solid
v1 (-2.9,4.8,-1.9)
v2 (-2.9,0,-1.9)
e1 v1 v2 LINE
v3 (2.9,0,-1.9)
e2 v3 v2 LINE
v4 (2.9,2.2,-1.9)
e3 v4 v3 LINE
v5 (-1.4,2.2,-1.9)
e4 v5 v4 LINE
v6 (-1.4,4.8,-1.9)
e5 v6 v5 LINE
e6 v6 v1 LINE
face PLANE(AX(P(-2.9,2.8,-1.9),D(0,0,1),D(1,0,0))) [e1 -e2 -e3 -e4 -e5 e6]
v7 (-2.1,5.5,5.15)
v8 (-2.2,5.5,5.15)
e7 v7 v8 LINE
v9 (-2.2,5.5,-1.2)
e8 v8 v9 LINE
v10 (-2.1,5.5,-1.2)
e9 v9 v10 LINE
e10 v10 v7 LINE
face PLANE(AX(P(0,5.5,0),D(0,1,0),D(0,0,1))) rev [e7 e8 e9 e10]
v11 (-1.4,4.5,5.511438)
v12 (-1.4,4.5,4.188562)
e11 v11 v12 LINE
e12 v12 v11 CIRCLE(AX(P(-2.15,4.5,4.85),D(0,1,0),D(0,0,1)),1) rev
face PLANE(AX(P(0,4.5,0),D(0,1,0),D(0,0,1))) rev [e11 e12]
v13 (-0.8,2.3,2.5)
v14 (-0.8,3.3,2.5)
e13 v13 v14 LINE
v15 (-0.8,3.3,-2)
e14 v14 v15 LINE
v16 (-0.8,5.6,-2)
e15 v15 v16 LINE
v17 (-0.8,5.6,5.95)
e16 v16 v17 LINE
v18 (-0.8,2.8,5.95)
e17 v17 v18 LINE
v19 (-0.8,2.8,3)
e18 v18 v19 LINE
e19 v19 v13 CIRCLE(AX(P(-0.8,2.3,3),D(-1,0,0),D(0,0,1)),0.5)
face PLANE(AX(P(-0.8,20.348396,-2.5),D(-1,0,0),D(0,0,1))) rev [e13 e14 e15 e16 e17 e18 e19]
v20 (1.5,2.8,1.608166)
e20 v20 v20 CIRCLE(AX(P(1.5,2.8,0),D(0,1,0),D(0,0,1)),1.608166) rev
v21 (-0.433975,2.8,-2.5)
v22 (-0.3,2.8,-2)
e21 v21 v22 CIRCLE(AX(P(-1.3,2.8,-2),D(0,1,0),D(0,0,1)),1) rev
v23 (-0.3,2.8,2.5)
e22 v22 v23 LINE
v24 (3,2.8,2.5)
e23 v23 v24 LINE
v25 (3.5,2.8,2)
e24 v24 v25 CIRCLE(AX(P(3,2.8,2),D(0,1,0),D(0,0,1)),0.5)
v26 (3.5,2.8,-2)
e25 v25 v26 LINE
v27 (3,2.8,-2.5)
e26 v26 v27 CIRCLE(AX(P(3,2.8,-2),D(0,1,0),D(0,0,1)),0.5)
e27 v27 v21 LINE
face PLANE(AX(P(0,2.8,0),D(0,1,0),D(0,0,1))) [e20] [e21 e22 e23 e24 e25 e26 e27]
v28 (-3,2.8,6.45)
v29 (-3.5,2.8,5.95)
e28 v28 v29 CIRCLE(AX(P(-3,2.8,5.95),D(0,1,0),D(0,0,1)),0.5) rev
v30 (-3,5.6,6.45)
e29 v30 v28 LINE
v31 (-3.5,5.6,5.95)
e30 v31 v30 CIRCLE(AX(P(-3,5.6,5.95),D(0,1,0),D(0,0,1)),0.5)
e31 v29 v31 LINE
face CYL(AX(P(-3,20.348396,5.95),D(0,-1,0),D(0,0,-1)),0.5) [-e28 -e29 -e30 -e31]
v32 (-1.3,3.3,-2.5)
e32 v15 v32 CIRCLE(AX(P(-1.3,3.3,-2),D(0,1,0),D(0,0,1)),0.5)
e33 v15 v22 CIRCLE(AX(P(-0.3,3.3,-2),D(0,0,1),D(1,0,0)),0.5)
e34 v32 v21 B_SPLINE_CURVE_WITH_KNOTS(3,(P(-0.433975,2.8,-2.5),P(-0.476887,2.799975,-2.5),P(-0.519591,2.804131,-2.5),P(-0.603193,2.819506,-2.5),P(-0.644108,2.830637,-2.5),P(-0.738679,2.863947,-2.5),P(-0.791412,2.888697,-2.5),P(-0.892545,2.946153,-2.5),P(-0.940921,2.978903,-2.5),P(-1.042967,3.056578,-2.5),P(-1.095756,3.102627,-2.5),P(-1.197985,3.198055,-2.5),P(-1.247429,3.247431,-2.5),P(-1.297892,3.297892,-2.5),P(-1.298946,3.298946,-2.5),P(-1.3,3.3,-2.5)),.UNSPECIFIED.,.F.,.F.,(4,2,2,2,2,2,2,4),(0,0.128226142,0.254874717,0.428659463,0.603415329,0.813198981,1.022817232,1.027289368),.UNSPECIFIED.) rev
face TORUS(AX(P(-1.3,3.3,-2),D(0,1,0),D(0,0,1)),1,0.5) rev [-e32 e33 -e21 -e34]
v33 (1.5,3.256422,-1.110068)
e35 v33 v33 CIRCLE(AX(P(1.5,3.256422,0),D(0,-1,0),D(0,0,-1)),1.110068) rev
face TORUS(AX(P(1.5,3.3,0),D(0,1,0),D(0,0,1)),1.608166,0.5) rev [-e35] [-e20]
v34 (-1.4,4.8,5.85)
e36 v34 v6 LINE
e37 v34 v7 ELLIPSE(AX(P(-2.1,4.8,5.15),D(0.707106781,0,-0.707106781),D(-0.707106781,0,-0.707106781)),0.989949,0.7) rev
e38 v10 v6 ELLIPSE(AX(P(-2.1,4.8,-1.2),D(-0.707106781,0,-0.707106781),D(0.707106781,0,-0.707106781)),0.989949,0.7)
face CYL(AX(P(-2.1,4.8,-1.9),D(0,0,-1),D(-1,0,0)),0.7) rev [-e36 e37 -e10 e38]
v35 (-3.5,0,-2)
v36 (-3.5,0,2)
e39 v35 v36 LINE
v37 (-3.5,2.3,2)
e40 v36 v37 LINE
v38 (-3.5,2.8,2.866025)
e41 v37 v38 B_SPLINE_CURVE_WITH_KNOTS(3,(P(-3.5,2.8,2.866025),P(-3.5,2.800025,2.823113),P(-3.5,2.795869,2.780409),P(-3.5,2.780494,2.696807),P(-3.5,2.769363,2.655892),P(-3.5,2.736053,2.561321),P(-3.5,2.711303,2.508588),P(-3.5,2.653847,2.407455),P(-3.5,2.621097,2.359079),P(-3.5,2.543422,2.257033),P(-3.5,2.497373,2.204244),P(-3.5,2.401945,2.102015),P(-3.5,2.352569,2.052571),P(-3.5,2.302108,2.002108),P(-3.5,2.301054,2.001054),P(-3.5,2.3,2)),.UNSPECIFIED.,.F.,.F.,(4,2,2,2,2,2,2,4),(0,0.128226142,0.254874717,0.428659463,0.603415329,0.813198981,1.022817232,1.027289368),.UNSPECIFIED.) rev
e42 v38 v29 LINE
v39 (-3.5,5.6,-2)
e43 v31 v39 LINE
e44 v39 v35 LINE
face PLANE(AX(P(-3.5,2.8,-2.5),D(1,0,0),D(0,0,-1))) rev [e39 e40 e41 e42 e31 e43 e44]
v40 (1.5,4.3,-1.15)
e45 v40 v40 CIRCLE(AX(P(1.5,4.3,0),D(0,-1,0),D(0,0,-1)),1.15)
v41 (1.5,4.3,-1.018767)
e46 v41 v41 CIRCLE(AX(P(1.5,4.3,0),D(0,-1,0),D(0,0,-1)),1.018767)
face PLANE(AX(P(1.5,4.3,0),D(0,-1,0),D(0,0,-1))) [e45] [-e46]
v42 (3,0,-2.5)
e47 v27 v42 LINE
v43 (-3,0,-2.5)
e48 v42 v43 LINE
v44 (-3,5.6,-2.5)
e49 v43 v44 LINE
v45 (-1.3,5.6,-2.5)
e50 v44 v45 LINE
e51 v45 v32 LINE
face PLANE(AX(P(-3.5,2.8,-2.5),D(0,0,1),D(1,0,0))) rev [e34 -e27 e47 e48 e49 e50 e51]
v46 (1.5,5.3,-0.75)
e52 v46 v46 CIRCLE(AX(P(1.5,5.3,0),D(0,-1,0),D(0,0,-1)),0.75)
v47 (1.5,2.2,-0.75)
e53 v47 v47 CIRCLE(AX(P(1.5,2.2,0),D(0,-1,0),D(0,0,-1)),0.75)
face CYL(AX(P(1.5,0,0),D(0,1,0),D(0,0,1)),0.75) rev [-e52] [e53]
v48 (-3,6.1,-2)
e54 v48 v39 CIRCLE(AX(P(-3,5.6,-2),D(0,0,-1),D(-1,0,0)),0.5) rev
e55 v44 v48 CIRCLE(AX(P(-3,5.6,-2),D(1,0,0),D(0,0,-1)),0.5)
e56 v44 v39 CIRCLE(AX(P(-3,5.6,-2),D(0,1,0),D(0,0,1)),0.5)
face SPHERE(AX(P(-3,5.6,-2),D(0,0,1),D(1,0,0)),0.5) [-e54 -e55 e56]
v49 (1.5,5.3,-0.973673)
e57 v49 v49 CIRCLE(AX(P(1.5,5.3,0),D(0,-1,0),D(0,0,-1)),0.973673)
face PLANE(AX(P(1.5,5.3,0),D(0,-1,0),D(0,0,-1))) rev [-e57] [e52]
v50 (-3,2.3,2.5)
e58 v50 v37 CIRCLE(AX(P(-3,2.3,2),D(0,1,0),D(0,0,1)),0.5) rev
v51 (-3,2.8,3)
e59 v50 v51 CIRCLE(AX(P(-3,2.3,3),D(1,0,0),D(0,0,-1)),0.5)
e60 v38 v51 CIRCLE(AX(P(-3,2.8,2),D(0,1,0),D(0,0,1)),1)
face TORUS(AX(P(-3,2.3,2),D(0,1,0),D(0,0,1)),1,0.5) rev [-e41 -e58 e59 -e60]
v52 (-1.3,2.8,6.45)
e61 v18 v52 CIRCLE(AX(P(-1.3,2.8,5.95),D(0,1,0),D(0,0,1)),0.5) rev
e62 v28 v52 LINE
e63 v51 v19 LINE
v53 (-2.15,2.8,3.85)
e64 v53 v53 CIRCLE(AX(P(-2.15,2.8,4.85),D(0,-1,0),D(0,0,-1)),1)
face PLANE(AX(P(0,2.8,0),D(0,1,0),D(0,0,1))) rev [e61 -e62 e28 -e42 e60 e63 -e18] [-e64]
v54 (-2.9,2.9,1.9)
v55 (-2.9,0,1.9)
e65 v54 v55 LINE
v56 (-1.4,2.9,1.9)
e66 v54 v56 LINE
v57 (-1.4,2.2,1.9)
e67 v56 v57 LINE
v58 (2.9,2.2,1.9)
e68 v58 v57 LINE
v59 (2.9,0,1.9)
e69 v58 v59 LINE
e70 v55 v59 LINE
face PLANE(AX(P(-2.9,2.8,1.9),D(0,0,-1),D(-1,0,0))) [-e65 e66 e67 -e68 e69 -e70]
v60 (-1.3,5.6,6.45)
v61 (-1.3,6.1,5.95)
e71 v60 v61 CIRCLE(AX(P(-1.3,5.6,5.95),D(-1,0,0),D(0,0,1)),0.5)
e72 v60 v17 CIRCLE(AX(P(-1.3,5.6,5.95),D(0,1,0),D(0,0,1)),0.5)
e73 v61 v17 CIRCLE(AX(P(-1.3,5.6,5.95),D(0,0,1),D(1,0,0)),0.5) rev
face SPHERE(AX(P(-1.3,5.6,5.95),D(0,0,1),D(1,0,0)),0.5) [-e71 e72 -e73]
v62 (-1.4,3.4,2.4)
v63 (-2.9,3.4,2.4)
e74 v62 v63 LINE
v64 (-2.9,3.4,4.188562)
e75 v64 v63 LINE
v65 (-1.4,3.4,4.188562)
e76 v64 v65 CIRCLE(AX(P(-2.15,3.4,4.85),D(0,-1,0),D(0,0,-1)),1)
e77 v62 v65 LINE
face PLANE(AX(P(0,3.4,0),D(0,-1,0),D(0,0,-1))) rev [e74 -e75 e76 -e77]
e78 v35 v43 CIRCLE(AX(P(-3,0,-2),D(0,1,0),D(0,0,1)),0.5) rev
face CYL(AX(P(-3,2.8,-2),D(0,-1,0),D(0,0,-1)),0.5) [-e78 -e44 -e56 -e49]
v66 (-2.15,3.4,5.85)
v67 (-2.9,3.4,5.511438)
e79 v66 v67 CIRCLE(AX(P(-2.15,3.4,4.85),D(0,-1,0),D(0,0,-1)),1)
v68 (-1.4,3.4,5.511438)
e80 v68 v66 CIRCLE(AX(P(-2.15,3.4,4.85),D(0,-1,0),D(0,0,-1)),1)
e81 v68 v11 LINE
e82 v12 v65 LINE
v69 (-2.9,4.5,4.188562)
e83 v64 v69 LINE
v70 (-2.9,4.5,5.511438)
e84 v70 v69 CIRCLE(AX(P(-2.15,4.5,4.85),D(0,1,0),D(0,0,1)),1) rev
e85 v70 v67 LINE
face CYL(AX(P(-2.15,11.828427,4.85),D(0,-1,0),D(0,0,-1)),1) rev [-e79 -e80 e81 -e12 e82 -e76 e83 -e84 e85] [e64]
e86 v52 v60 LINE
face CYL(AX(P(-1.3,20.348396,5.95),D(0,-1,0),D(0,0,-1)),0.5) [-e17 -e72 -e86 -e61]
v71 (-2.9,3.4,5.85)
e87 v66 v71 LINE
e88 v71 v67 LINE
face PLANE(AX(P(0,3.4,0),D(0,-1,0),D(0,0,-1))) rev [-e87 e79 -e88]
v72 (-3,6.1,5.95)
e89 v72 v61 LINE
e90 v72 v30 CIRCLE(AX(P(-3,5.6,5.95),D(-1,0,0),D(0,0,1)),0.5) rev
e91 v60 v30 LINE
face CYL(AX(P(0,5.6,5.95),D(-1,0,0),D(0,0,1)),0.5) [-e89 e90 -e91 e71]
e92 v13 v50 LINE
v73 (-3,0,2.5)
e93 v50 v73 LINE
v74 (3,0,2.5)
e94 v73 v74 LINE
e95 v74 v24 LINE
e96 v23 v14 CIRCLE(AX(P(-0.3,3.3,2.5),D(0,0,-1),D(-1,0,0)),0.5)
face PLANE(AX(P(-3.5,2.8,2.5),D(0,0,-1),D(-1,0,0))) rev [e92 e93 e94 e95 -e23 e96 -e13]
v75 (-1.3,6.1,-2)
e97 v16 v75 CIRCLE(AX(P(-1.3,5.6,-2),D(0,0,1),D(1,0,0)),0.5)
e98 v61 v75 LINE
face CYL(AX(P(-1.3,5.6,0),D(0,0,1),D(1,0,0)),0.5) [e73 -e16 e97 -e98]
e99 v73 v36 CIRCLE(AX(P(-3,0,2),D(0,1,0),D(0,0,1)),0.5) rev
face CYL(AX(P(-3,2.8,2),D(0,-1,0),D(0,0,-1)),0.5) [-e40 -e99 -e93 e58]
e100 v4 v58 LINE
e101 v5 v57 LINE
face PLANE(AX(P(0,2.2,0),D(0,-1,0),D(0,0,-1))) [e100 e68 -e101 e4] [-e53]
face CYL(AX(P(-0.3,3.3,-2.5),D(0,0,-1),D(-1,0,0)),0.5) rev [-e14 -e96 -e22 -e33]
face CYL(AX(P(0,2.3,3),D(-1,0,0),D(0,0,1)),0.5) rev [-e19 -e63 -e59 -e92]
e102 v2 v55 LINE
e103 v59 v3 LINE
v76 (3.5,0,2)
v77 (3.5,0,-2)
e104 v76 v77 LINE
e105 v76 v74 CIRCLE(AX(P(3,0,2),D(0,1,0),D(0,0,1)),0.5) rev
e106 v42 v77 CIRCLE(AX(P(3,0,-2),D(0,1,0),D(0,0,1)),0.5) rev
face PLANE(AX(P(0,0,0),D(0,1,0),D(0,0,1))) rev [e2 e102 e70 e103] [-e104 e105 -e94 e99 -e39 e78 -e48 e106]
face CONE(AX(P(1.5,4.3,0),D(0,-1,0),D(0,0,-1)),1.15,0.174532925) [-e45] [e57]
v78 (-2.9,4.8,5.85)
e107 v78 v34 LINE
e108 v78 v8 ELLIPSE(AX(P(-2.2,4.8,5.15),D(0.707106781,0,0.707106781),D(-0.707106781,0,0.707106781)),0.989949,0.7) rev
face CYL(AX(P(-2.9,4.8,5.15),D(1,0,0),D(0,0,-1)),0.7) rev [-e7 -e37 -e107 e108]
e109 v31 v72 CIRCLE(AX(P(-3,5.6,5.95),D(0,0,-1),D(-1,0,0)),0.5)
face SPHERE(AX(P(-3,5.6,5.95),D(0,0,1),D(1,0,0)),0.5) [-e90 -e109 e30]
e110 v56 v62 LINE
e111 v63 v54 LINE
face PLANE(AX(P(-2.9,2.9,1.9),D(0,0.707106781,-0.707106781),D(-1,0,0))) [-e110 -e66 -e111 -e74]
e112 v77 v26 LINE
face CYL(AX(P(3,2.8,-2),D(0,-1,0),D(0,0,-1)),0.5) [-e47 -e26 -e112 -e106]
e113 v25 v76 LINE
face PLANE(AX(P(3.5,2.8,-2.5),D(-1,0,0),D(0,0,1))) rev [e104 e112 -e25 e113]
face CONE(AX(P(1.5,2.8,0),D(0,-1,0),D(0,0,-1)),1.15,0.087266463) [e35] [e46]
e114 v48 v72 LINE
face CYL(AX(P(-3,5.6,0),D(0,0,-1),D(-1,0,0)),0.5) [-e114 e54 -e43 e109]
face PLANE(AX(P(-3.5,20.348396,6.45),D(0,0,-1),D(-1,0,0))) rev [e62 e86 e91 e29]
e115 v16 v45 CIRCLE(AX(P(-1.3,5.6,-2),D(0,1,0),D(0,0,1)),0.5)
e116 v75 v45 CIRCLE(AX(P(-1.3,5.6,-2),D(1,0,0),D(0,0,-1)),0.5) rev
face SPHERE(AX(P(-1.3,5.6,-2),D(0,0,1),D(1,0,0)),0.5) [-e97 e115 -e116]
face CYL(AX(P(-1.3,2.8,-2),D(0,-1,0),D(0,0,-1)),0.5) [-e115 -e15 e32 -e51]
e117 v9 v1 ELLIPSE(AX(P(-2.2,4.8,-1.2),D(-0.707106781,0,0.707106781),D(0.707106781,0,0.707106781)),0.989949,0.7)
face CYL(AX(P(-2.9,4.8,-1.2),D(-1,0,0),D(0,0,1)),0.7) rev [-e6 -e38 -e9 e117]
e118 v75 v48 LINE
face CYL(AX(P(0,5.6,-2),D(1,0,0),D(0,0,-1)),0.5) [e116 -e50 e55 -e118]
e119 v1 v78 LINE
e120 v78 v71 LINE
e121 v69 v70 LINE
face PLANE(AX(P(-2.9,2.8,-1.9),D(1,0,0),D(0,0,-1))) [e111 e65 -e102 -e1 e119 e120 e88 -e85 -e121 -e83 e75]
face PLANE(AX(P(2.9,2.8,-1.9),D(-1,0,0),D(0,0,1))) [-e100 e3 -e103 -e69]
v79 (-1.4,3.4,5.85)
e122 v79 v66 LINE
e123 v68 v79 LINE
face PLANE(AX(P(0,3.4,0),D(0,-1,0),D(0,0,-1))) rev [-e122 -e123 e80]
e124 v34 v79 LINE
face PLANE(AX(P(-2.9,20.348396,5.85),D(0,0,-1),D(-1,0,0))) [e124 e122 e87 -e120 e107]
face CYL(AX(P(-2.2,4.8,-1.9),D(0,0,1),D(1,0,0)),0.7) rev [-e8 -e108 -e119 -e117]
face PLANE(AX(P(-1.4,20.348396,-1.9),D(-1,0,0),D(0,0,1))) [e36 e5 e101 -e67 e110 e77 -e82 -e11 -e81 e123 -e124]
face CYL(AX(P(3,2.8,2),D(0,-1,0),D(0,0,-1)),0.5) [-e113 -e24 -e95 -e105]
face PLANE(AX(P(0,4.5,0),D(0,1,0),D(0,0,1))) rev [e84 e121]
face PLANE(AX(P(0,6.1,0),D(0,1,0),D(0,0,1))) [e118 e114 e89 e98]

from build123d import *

# Parameters (mm, degrees)
SKETCH1_W               = 7
SKETCH1_H               = 5
SKETCH1_W_2             = 5.8
SKETCH1_H_2             = 3.8
BOSS_EXTRUDE1_DEPTH     = 2.8
SKETCH3_W               = 2.7
SKETCH3_H               = 8.95
SKETCH3_W_2             = 1.5
SKETCH3_H_2             = 7.75
BOSS_EXTRUDE2_DEPTH     = 2.7
SKETCH4_W               = 2.7
SKETCH4_H               = 4.55
BOSS_EXTRUDE3_DEPTH     = 0.6
SKETCH5_W               = 2.7
SKETCH5_H               = 8.95
BOSS_EXTRUDE4_DEPTH     = 0.6
SKETCH6_W               = 4.9
SKETCH6_H               = 5
BOSS_EXTRUDE5_DEPTH     = 0.6
FILLET2_R               = 0.7
SKETCH7_R               = 1
CUT_EXTRUDE1_DEPTH      = 1.7
SKETCH8_R               = 1.15
BOSS_EXTRUDE6_DEPTH     = 1.5
BOSS_EXTRUDE6_DRAFT     = -5
FILLET1_R               = 0.5
BOSS_EXTRUDE7_START     = -1.5
SKETCH8_2_R             = 1.15
BOSS_EXTRUDE7_DEPTH     = 1
BOSS_EXTRUDE7_DRAFT     = -10
CUT_EXTRUDE2_DEPTH      = 10.052209675
CUT_EXTRUDE2_DEPTH_BACK = 10.052209675
SKETCH9_R               = 0.75
FILLET3_R               = 0.5
FILLET5_R               = 0.5
FILLET6_R               = 0.5
FILLET7_R               = 0.5
CHAMFER1_SIZE           = 0.5


with BuildPart() as part:
    # Sketch1 → Boss-Extrude1 (new body)
    with BuildSketch(Plane(origin=(0, 0, 0), x_dir=(1, 0, 0), z_dir=(0, 1, 0))):
        Rectangle(SKETCH1_W, SKETCH1_H)
        Rectangle(SKETCH1_W_2, SKETCH1_H_2, mode=Mode.SUBTRACT)
    extrude(amount=BOSS_EXTRUDE1_DEPTH)

    # Sketch3 → Boss-Extrude2 (add)
    with BuildSketch(Plane(origin=(0, 2.8, 0), x_dir=(1, 0, 0), z_dir=(0, 1, 0))):
        with Locations((-2.15, -1.975)):
            Rectangle(SKETCH3_W, SKETCH3_H)
        with Locations((-2.15, -1.975)):
            Rectangle(SKETCH3_W_2, SKETCH3_H_2, mode=Mode.SUBTRACT)
    extrude(amount=BOSS_EXTRUDE2_DEPTH)

    # Sketch4 → Boss-Extrude3 (add)
    with BuildSketch(Plane.XZ.offset(-2.8)):
        with Locations((-2.15, 4.175)):
            Rectangle(SKETCH4_W, SKETCH4_H)
    extrude(amount=-BOSS_EXTRUDE3_DEPTH)

    # Sketch5 → Boss-Extrude4 (add)
    with BuildSketch(Plane(origin=(0, 5.5, 0), x_dir=(1, 0, 0), z_dir=(0, 1, 0))):
        with Locations((-2.15, -1.975)):
            Rectangle(SKETCH5_W, SKETCH5_H)
    extrude(amount=BOSS_EXTRUDE4_DEPTH)

    # Sketch6 → Boss-Extrude5 (add)
    with BuildSketch(Plane(origin=(0, 2.8, 0), x_dir=(1, 0, 0), z_dir=(0, 1, 0))):
        with Locations((1.05, 0)):
            Rectangle(SKETCH6_W, SKETCH6_H)
    extrude(amount=-BOSS_EXTRUDE5_DEPTH)

    # Fillet2
    fillet2_edges = [part.edges().sort_by_distance(p)[0] for p in [
        (-2.15, 5.5, -1.9),
        (-1.4, 5.5, 1.975),
        (-2.15, 5.5, 5.85),
        (-2.9, 5.5, 1.975),
    ]]
    fillet(fillet2_edges, radius=FILLET2_R)

    # Sketch7 → Cut-Extrude1 (cut)
    with BuildSketch(Plane.XZ.offset(-2.8)):
        with Locations(Location((-2.15, 4.85, 0), (0, 0, 270))):
            Circle(SKETCH7_R)
    extrude(amount=-CUT_EXTRUDE1_DEPTH, mode=Mode.SUBTRACT)


with BuildPart() as boss_extrude6_tool:
    # Sketch8 → Boss-Extrude6 (with draft: the straight prism first)
    with BuildSketch(Plane(origin=(0, 2.8, 0), x_dir=(-1, 0, 0), z_dir=(0, -1, 0))):
        with Locations((-1.5, 0)):
            Circle(SKETCH8_R)
    extrude(amount=-BOSS_EXTRUDE6_DEPTH)
    # Boss-Extrude6: the draft: its side faces are tilted about the plane it starts from
    boss_extrude6_sides = [boss_extrude6_tool.faces().sort_by_distance(p)[0] for p in [
        (2.65, 3.55, 0),
    ]]
    draft(boss_extrude6_sides, Plane(origin=(0, 2.8, 0), x_dir=(-1, 0, 0), z_dir=(0, -1, 0)), BOSS_EXTRUDE6_DRAFT)


with BuildPart() as part_1:
    add(part.part)

    # Boss-Extrude6: add boss_extrude6_tool
    add(boss_extrude6_tool.part)

    # Fillet1
    fillet1_edges = [part_1.edges().sort_by_distance(p)[0] for p in [
        (2.65, 2.8, 0),
    ]]
    fillet(fillet1_edges, radius=FILLET1_R)


with BuildPart() as boss_extrude7_tool:
    # Sketch8<2> → Boss-Extrude7 (with draft: the straight prism first)
    with BuildSketch(Plane(origin=(0, 2.8, 0), x_dir=(-1, 0, 0), z_dir=(0, -1, 0)).offset(BOSS_EXTRUDE7_START)):
        with Locations((-1.5, 0)):
            Circle(SKETCH8_2_R)
    extrude(amount=-BOSS_EXTRUDE7_DEPTH)
    # Boss-Extrude7: the draft: its side faces are tilted about the plane it starts from
    boss_extrude7_sides = [boss_extrude7_tool.faces().sort_by_distance(p)[0] for p in [
        (2.65, 4.8, 0),
    ]]
    draft(boss_extrude7_sides, Plane(origin=(0, 2.8, 0), x_dir=(-1, 0, 0), z_dir=(0, -1, 0)).offset(BOSS_EXTRUDE7_START), BOSS_EXTRUDE7_DRAFT)


with BuildPart() as part_2:
    add(part_1.part)

    # Boss-Extrude7: add boss_extrude7_tool
    add(boss_extrude7_tool.part)

    # Sketch9 → Cut-Extrude2 (cut, two sides: drawn at the far end of the back side and taken through both)
    with BuildSketch(Plane(origin=(0, 5.3, 0), x_dir=(1, 0, 0), z_dir=(0, 1, 0)).offset(-CUT_EXTRUDE2_DEPTH_BACK)):
        with Locations(Location((1.5, 0, 0), (0, 0, 90))):
            Circle(SKETCH9_R)
    extrude(amount=CUT_EXTRUDE2_DEPTH + CUT_EXTRUDE2_DEPTH_BACK, mode=Mode.SUBTRACT)

    # Fillet3
    fillet3_edges = [part_2.edges().sort_by_distance(p)[0] for p in [
        (-3.5, 6.1, 1.975),
        (-2.15, 6.1, 6.45),
        (-0.8, 6.1, 1.975),
        (-2.15, 6.1, -2.5),
    ]]
    fillet(fillet3_edges, radius=FILLET3_R)

    # Fillet5
    # the kernel refuses this fillet: 0.5 mm, written as the material it takes off along each edge
    with BuildSketch(Plane(origin=(-1.3, 5.6, -2), x_dir=(1, 0, 0), z_dir=(0, 0, -1))) as fillet5_piece_1_section:
        Polygon((0, 0), (FILLET5_R, 0), (FILLET5_R, -FILLET5_R), (0, -FILLET5_R), align=None)
    fillet5_piece_1 = extrude(amount=FILLET5_R, mode=Mode.PRIVATE)
    fillet5_piece_1 = fillet5_piece_1 - Plane(origin=(-1.3, 5.6, -2), x_dir=(-0.7071067811865475, -0.7071067811865475, 0), z_dir=(0, 0, -1)) * Sphere(FILLET5_R, mode=Mode.PRIVATE)
    add(fillet5_piece_1, mode=Mode.SUBTRACT)
    with BuildSketch(Plane(origin=(-1.3, 5.6, 5.95), x_dir=(0, 0, 1), z_dir=(1, 0, 0))) as fillet5_piece_2_section:
        Polygon((0, 0), (FILLET5_R, 0), (FILLET5_R, -FILLET5_R), (0, -FILLET5_R), align=None)
    fillet5_piece_2 = extrude(amount=FILLET5_R, mode=Mode.PRIVATE)
    fillet5_piece_2 = fillet5_piece_2 - Plane(origin=(-1.3, 5.6, 5.95), x_dir=(0, -0.7071067811865475, -0.7071067811865475), z_dir=(1, 0, 0)) * Sphere(FILLET5_R, mode=Mode.PRIVATE)
    add(fillet5_piece_2, mode=Mode.SUBTRACT)
    with BuildSketch(Plane(origin=(-3, 5.6, -2), x_dir=(-1, 0, 0), z_dir=(0, 0, -1))) as fillet5_piece_3_section:
        Polygon((0, 0), (FILLET5_R, 0), (FILLET5_R, FILLET5_R), (0, FILLET5_R), align=None)
    fillet5_piece_3 = extrude(amount=FILLET5_R, mode=Mode.PRIVATE)
    fillet5_piece_3 = fillet5_piece_3 - Plane(origin=(-3, 5.6, -2), x_dir=(0.7071067811865475, -0.7071067811865475, 0), z_dir=(0, 0, -1)) * Sphere(FILLET5_R, mode=Mode.PRIVATE)
    add(fillet5_piece_3, mode=Mode.SUBTRACT)
    with BuildSketch(Plane(origin=(-3, 5.6, 5.95), x_dir=(0, 0, 1), z_dir=(-1, 0, 0))) as fillet5_piece_4_section:
        Polygon((0, 0), (FILLET5_R, 0), (FILLET5_R, FILLET5_R), (0, FILLET5_R), align=None)
    fillet5_piece_4 = extrude(amount=FILLET5_R, mode=Mode.PRIVATE)
    fillet5_piece_4 = fillet5_piece_4 - Plane(origin=(-3, 5.6, 5.95), x_dir=(0, -0.7071067811865475, -0.7071067811865475), z_dir=(-1, 0, 0)) * Sphere(FILLET5_R, mode=Mode.PRIVATE)
    add(fillet5_piece_4, mode=Mode.SUBTRACT)
    with BuildSketch(Plane(origin=(-3.5, 1.55, 6.45), x_dir=(0, 0, -1), z_dir=(0, 1, 0)), Plane(origin=(-0.8, 5.6, 6.45), x_dir=(0, 0, -1), z_dir=(0, -1, 0)), Plane(origin=(-3.5, -1.25, 2.5), x_dir=(0, 0, -1), z_dir=(0, 1, 0))) as fillet5_piece_5:
        with BuildLine():
            CenterArc((FILLET5_R, -FILLET5_R), FILLET5_R, 90, 90)
            Line((0, -FILLET5_R), (0, 0))
            Line((0, 0), (FILLET5_R, 0))
        make_face()
    extrude(amount=4.05, mode=Mode.SUBTRACT)
    with BuildSketch(Plane(origin=(-3.5, -1.25, -2.5), x_dir=(1, 0, 0), z_dir=(0, 1, 0))) as fillet5_piece_6:
        with BuildLine():
            CenterArc((FILLET5_R, -FILLET5_R), FILLET5_R, 90, 90)
            Line((0, -FILLET5_R), (0, 0))
            Line((0, 0), (FILLET5_R, 0))
        make_face()
    extrude(amount=6.85, mode=Mode.SUBTRACT)
    with BuildSketch(Plane(origin=(-0.8, 5.6, -2.5), x_dir=(-1, 0, 0), z_dir=(0, -1, 0))) as fillet5_piece_7:
        with BuildLine():
            CenterArc((FILLET5_R, -FILLET5_R), FILLET5_R, 90, 90)
            Line((0, -FILLET5_R), (0, 0))
            Line((0, 0), (FILLET5_R, 0))
        make_face()
    extrude(amount=2.8, mode=Mode.SUBTRACT)
    with BuildSketch(Plane(origin=(3.5, 4.05, -2.5), x_dir=(-1, 0, 0), z_dir=(0, -1, 0)), Plane(origin=(3.5, 4.05, 2.5), x_dir=(0, 0, -1), z_dir=(0, -1, 0))) as fillet5_piece_8:
        with BuildLine():
            CenterArc((FILLET5_R, -FILLET5_R), FILLET5_R, 90, 90)
            Line((0, -FILLET5_R), (0, 0))
            Line((0, 0), (FILLET5_R, 0))
        make_face()
    extrude(amount=5.3, mode=Mode.SUBTRACT)

    # Fillet6
    # the kernel refuses this fillet: 0.5 mm, written as the material it adds along each edge
    with BuildSketch(Plane(origin=(-1.3, 2.8, -2), x_dir=(-0.5976672776328278, 0, 0.8017442392976482), z_dir=(0.8017442392976482, 0, 0.5976672776328278))) as fillet6_piece_1_section:
        with BuildLine():
            CenterArc((0.5 + FILLET6_R, -FILLET6_R), FILLET6_R, 90, 90)
            Line((0.5, -FILLET6_R), (0.5, 0))
            Line((0.5, 0), (0.5 + FILLET6_R, 0))
        make_face()
    fillet6_piece_1 = revolve(axis=Axis((-1.3, 2.8, -2), (0, -1, 0)), revolution_arc=233.296989237, mode=Mode.PRIVATE)
    fillet6_piece_1 = split(fillet6_piece_1, bisect_by=Plane(origin=(-0.925030534, 2.955814156, -2.5), z_dir=(0, 0, 1)), keep=Keep.TOP, mode=Mode.PRIVATE)
    fillet6_piece_1 = split(fillet6_piece_1, bisect_by=Plane(origin=(-0.925030534, 2.955814156, -1.9), z_dir=(0, 0, -1)), keep=Keep.TOP, mode=Mode.PRIVATE)
    add(fillet6_piece_1)
    with BuildSketch(Plane(origin=(-0.8, 2.8, 2.5), x_dir=(1, 0, 0), z_dir=(0, 0, -1))) as fillet6_piece_2:
        with BuildLine():
            CenterArc((FILLET6_R, -FILLET6_R), FILLET6_R, 90, 90)
            Line((0, -FILLET6_R), (0, 0))
            Line((0, 0), (FILLET6_R, 0))
        make_face()
    extrude(amount=4.5)

    # Fillet7
    # the kernel refuses this fillet: 0.5 mm, written as the material it adds along each edge
    with BuildSketch(Plane(origin=(-0.8, 2.8, 2.5), x_dir=(0, -1, 0), z_dir=(-1, 0, 0))) as fillet7_piece_1:
        with BuildLine():
            CenterArc((FILLET7_R, FILLET7_R), FILLET7_R, 180, 90)
            Line((0, FILLET7_R), (0, 0))
            Line((0, 0), (FILLET7_R, 0))
        make_face()
    extrude(amount=2.2)
    with BuildSketch(Plane(origin=(-3, 2.8, 2), x_dir=(0.8017442392976479, 0, -0.597667277632828), z_dir=(0.597667277632828, 0, 0.8017442392976479))) as fillet7_piece_2_section:
        with BuildLine():
            CenterArc((0.5 + FILLET7_R, -FILLET7_R), FILLET7_R, 90, 90)
            Line((0.5, -FILLET7_R), (0.5, 0))
            Line((0.5, 0), (0.5 + FILLET7_R, 0))
        make_face()
    fillet7_piece_2 = revolve(axis=Axis((-3, 2.8, 2), (0, 1, 0)), revolution_arc=233.296989237, mode=Mode.PRIVATE)
    fillet7_piece_2 = split(fillet7_piece_2, bisect_by=Plane(origin=(-3.5, 2.644185551, 2.37496936), z_dir=(1, 0, 0)), keep=Keep.TOP, mode=Mode.PRIVATE)
    fillet7_piece_2 = split(fillet7_piece_2, bisect_by=Plane(origin=(-2.9, 2.644185551, 2.37496936), z_dir=(-1, 0, 0)), keep=Keep.TOP, mode=Mode.PRIVATE)
    add(fillet7_piece_2)

    # Chamfer1
    chamfer1_edges = [part_2.edges().sort_by_distance(p)[0] for p in [
        (-2.15, 3.4, 1.9),
    ]]
    chamfer(chamfer1_edges, length=CHAMFER1_SIZE)


solid = part_2.part
